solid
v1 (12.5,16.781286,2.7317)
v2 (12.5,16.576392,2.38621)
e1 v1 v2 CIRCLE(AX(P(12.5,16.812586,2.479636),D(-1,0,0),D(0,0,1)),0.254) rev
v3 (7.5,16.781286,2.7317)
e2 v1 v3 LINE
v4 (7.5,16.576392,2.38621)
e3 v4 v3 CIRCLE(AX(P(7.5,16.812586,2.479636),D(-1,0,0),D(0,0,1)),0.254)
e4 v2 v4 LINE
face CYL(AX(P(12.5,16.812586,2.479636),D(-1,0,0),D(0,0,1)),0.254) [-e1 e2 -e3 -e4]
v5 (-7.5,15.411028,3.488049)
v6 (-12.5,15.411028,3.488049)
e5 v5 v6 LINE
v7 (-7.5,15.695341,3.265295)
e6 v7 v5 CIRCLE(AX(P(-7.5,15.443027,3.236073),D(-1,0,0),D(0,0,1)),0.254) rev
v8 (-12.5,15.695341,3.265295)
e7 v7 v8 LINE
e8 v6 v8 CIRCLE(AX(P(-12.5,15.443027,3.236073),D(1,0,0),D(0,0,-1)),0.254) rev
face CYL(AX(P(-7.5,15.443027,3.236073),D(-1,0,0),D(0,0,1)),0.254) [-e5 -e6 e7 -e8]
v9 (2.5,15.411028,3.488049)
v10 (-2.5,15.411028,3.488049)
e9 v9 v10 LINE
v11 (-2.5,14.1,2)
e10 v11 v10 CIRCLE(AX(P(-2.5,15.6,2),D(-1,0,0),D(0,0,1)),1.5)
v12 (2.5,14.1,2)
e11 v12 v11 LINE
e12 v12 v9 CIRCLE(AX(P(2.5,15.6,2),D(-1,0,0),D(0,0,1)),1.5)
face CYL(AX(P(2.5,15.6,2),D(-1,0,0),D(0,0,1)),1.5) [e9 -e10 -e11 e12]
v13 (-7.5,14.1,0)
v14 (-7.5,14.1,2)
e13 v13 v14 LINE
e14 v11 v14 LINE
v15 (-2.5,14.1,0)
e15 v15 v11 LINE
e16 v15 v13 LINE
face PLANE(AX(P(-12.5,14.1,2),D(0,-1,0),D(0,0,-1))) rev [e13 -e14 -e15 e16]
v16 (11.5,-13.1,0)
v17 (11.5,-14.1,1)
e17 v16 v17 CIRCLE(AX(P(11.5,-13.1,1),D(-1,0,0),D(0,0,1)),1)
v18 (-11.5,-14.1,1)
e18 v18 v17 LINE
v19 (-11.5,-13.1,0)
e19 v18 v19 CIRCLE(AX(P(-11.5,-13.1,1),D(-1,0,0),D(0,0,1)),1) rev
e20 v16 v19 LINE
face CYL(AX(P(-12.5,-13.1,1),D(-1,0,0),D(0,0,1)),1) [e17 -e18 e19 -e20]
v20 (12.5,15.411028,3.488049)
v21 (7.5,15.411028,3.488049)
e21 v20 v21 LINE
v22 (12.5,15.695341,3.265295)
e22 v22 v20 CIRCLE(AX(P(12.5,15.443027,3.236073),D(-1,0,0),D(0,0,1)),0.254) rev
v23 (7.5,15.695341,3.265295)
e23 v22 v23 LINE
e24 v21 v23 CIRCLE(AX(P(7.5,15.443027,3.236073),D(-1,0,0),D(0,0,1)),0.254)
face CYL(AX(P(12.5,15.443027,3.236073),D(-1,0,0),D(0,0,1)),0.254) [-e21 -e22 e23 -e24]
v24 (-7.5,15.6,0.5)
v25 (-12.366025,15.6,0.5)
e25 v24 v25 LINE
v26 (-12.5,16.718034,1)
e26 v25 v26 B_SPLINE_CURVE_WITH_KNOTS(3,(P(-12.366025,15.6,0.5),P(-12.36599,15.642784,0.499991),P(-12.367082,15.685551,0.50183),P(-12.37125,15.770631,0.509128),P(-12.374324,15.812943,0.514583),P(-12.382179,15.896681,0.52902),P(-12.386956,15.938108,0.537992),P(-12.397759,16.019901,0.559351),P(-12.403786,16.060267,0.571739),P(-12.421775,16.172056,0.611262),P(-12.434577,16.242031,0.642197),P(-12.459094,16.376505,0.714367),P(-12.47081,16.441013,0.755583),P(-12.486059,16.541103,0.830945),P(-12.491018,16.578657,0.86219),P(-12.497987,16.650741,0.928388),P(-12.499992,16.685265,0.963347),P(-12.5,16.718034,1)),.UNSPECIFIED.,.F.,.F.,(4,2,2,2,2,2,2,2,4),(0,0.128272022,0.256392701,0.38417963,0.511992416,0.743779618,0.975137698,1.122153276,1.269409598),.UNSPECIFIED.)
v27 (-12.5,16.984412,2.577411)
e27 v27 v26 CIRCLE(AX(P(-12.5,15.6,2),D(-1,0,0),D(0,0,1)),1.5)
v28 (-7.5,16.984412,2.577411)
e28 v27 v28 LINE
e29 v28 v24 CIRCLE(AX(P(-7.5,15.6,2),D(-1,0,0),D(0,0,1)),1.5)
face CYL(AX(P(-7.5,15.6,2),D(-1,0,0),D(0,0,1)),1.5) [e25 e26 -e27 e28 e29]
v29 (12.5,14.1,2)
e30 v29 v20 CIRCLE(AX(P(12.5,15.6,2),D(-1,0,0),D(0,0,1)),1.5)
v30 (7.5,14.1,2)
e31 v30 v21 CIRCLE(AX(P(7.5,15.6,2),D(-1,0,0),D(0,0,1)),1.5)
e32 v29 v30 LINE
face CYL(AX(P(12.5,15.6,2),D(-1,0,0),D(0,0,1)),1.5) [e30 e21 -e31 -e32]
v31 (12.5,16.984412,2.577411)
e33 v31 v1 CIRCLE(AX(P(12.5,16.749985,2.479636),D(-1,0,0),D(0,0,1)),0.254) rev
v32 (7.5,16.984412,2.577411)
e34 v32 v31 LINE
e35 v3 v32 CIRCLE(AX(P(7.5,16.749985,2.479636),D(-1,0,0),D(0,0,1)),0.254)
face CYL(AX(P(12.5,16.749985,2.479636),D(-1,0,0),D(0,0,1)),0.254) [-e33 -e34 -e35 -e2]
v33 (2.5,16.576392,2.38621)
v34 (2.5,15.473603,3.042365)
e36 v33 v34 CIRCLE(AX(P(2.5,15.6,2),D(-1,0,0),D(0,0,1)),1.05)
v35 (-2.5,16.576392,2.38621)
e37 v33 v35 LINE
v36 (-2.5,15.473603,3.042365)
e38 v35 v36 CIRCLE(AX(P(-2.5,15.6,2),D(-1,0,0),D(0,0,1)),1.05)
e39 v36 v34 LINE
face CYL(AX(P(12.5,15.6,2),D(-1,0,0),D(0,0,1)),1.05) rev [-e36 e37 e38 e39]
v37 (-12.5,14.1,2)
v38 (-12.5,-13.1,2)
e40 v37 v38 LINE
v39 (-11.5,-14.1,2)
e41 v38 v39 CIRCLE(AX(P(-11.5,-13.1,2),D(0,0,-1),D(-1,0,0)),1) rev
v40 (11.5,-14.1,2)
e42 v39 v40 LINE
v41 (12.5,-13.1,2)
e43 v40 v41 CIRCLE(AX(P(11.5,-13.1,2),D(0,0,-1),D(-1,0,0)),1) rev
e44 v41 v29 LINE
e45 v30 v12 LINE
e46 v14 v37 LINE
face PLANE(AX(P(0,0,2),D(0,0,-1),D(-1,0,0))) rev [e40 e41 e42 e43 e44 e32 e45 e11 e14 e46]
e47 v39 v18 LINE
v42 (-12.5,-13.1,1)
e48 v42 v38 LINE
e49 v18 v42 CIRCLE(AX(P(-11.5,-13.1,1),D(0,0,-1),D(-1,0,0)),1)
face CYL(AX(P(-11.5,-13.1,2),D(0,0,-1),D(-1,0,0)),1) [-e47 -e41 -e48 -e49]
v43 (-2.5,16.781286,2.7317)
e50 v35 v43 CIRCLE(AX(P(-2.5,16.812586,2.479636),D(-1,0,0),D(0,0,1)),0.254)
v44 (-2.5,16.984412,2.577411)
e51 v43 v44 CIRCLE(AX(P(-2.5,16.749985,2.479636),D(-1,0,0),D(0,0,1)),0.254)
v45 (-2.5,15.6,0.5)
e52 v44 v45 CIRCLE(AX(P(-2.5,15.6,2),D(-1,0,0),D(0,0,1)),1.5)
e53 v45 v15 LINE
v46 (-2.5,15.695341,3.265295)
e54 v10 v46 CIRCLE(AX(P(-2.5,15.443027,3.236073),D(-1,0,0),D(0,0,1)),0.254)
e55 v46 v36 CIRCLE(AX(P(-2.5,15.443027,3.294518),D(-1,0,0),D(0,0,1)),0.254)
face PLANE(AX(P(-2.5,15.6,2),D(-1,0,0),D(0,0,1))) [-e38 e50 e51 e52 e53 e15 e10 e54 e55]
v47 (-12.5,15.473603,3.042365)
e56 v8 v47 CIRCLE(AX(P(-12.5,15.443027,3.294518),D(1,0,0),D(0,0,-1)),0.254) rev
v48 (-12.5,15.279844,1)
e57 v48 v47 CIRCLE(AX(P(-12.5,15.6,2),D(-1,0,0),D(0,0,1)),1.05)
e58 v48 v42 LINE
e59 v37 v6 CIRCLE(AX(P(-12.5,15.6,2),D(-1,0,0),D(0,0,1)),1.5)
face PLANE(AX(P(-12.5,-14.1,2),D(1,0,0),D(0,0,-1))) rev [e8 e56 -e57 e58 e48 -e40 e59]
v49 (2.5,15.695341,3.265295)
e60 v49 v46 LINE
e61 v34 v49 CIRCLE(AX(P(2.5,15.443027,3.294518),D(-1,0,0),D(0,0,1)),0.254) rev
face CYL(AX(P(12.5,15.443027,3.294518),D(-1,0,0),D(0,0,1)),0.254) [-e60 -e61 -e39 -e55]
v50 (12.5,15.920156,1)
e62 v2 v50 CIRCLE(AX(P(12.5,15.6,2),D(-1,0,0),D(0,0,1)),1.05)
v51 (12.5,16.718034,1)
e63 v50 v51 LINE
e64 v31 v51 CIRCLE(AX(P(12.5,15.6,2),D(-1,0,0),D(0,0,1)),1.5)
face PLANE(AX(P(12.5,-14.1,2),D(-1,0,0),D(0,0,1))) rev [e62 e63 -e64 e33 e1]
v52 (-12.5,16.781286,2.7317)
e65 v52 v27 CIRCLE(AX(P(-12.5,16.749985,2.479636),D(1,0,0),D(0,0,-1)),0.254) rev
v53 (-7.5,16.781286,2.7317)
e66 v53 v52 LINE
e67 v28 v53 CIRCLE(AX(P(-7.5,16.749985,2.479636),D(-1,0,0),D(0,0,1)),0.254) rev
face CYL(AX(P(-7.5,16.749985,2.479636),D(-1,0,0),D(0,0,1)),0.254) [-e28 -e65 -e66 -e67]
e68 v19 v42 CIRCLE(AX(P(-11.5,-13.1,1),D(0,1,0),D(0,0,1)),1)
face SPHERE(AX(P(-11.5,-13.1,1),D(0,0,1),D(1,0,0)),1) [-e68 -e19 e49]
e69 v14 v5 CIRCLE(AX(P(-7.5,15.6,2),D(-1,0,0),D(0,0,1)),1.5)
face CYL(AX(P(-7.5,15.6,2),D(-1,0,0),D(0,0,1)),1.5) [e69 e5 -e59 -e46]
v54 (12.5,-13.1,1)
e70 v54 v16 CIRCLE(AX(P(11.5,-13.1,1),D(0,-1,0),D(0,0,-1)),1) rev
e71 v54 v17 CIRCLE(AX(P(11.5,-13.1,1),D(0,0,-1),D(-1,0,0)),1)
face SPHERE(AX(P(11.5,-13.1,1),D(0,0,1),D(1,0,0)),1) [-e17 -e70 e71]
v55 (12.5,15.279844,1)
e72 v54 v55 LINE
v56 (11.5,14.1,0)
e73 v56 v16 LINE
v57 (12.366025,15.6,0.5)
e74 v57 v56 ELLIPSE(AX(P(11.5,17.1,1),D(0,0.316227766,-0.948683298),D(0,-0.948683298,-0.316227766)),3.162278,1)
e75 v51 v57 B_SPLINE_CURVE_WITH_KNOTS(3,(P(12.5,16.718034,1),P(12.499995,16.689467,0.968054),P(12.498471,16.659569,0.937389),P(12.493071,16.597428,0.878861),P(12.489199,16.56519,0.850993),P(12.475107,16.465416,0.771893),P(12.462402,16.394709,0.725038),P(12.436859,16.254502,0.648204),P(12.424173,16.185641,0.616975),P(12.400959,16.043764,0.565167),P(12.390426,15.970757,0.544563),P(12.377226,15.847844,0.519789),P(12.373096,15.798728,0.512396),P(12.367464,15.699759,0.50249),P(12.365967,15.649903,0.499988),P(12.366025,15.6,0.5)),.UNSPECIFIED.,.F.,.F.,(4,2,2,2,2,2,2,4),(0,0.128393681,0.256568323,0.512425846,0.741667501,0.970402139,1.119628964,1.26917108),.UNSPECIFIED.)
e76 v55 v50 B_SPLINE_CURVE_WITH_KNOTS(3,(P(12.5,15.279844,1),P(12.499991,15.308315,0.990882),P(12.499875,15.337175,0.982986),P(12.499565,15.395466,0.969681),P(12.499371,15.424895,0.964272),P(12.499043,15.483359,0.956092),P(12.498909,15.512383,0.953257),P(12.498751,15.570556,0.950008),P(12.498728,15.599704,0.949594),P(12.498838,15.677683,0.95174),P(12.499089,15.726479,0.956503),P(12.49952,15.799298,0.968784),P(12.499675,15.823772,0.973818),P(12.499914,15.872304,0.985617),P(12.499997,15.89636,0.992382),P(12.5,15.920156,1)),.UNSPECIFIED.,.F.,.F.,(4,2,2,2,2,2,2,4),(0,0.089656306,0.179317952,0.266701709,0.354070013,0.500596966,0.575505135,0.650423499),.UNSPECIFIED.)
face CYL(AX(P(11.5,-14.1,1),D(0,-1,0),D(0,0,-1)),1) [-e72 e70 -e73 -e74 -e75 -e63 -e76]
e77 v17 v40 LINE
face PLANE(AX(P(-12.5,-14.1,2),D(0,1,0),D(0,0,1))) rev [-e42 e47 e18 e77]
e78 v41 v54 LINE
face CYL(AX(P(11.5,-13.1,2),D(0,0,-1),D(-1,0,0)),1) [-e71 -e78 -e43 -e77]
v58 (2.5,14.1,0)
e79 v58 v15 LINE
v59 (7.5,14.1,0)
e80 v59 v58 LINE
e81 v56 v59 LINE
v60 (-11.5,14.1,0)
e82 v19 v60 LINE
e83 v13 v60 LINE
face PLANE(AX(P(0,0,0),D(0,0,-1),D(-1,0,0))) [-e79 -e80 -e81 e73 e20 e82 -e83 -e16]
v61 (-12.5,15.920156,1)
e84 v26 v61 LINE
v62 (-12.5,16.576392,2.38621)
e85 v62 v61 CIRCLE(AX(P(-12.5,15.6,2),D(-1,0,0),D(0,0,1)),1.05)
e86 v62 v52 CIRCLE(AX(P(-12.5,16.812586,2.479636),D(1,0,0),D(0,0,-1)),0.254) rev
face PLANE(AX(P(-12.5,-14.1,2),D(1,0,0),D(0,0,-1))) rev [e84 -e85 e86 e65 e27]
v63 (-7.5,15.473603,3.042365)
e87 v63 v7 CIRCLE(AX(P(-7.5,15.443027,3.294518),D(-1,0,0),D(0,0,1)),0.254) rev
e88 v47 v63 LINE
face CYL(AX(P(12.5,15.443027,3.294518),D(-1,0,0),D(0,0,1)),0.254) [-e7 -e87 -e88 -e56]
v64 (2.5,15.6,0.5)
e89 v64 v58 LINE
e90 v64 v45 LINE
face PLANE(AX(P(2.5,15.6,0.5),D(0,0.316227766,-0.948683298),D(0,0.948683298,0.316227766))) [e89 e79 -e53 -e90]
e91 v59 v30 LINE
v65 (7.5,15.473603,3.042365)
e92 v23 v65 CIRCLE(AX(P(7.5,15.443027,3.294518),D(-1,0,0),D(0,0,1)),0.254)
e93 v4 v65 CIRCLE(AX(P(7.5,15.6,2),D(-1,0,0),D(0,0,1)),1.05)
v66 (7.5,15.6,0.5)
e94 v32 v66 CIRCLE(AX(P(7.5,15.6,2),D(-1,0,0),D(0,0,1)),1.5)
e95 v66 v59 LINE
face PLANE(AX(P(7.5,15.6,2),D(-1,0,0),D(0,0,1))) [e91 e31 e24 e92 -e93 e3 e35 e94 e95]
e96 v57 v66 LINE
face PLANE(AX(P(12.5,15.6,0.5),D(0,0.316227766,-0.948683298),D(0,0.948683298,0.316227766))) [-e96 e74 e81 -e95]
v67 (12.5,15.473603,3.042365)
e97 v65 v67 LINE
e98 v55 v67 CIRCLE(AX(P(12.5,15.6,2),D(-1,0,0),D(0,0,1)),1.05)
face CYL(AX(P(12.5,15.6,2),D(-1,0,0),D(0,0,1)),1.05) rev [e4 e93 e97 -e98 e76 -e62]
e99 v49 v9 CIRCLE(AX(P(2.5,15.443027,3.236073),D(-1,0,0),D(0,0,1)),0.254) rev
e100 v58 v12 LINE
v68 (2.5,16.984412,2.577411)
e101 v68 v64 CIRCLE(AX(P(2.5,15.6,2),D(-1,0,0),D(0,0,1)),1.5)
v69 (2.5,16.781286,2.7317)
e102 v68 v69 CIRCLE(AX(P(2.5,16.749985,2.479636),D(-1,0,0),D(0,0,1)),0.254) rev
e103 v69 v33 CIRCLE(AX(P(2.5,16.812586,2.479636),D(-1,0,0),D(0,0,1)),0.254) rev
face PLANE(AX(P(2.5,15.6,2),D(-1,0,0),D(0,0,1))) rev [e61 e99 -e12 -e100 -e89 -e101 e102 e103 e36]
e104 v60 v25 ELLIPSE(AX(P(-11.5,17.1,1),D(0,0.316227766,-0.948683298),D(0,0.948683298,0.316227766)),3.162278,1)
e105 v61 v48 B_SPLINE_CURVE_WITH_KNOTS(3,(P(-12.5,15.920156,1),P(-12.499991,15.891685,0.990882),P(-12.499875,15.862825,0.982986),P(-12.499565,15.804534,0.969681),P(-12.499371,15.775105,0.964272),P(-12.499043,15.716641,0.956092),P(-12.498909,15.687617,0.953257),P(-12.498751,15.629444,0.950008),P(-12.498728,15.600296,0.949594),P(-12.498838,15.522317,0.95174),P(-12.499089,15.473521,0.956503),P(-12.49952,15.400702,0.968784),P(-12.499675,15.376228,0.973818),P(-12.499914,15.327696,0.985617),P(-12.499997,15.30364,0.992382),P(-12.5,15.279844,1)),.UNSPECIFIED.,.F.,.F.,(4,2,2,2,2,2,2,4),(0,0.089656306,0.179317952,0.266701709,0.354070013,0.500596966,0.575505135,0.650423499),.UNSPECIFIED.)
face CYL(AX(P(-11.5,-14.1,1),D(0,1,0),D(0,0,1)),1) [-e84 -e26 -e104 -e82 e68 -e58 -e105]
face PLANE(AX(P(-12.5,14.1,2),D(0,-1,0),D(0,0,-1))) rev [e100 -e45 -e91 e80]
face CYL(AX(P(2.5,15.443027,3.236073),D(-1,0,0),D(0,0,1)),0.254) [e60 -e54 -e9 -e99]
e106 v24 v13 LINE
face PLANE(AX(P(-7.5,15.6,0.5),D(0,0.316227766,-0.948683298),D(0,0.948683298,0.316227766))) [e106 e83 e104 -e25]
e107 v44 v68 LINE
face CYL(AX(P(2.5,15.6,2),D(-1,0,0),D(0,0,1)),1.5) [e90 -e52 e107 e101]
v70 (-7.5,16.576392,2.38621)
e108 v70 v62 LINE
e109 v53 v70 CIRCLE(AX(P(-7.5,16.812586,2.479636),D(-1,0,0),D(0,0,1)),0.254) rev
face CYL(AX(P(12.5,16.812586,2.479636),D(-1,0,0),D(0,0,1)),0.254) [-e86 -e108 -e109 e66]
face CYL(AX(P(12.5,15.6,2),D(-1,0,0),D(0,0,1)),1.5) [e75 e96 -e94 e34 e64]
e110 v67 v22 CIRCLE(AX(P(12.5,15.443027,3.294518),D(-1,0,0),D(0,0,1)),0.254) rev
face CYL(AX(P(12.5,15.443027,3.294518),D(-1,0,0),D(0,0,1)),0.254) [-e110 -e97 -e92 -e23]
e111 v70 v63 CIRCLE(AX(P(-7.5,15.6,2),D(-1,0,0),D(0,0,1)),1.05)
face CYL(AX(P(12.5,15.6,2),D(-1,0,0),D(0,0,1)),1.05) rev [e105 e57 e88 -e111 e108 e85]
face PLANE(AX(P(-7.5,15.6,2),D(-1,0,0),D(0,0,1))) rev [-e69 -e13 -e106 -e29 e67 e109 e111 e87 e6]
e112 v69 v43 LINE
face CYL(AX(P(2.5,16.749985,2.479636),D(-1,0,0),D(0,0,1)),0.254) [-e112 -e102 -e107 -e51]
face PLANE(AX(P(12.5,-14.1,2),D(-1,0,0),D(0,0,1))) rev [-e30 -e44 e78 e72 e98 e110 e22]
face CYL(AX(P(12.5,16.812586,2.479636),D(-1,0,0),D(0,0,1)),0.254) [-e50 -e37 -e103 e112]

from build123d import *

# Parameters (mm, degrees)
SKETCH1_W           = 25
SKETCH1_H           = 28.2
BOSS_EXTRUDE1_DEPTH = 2
BOSS_EXTRUDE2_DEPTH = 5
LPATTERN1_COUNT     = 3
LPATTERN1_PITCH     = 10
SKETCH6_R           = 1.050000034
CUT_EXTRUDE1_DEPTH  = 31.490326335
FILLET1_R           = 1
FILLET2_R           = 1
SKETCH7_W           = 1.937328833
SKETCH7_H           = 1.211322367
CUT_EXTRUDE2_DEPTH  = 31.490326484
FILLET7_R           = 0.254


with BuildPart() as part:
    # Sketch1 → Boss-Extrude1 (new body)
    with BuildSketch(Plane.XY):
        Rectangle(SKETCH1_W, SKETCH1_H)
    extrude(amount=BOSS_EXTRUDE1_DEPTH)

    # Sketch5 → Boss-Extrude2 (add)
    with BuildSketch(Plane.ZY.offset(12.5)):
        with BuildLine():
            Line((0.5, 15.6), (0, 14.1))
            Line((0, 14.1), (2, 14.1))
            ThreePointArc((2, 14.1), (3.060660172, 16.660660172), (0.5, 15.6))
        make_face()
    boss_extrude2 = extrude(amount=-BOSS_EXTRUDE2_DEPTH)

    # LPattern1: Boss-Extrude2 ×3
    with Locations(*[(i * LPATTERN1_PITCH, 0, 0) for i in range(1, LPATTERN1_COUNT)]):
        add(boss_extrude2)

    # Sketch6 → Cut-Extrude1 (cut, through all)
    with BuildSketch(Plane.ZY.offset(12.5)):
        with Locations((2, 15.6)):
            Circle(SKETCH6_R)
    extrude(amount=-CUT_EXTRUDE1_DEPTH, mode=Mode.SUBTRACT)

    # Fillet1
    # the kernel refuses this fillet: 1 mm, written as the material it takes off along each edge
    with BuildSketch(Plane(origin=(12.5, -20.1, 0), x_dir=(0, 0, 1), z_dir=(0, 1, 0)), Plane(origin=(-12.5, 20.1, 0), x_dir=(0, 0, 1), z_dir=(0, -1, 0))) as fillet1_piece_1:
        with BuildLine():
            CenterArc((FILLET1_R, -FILLET1_R), FILLET1_R, 90, 90)
            Line((0, -FILLET1_R), (-FILLET1_R * 0.02, -FILLET1_R))
            Line((-FILLET1_R * 0.02, -FILLET1_R), (-FILLET1_R * 0.02, FILLET1_R * 0.02))
            Line((-FILLET1_R * 0.02, FILLET1_R * 0.02), (FILLET1_R, FILLET1_R * 0.02))
            Line((FILLET1_R, FILLET1_R * 0.02), (FILLET1_R, 0))
        make_face()
    extrude(amount=40.2, mode=Mode.SUBTRACT)
    with BuildSketch(Plane(origin=(-18.5, -14.1, 0), x_dir=(0, 0, 1), z_dir=(1, 0, 0))) as fillet1_piece_2:
        with BuildLine():
            CenterArc((FILLET1_R, -FILLET1_R), FILLET1_R, 90, 90)
            Line((0, -FILLET1_R), (-FILLET1_R * 0.02, -FILLET1_R))
            Line((-FILLET1_R * 0.02, -FILLET1_R), (-FILLET1_R * 0.02, FILLET1_R * 0.02))
            Line((-FILLET1_R * 0.02, FILLET1_R * 0.02), (FILLET1_R, FILLET1_R * 0.02))
            Line((FILLET1_R, FILLET1_R * 0.02), (FILLET1_R, 0))
        make_face()
    extrude(amount=37, mode=Mode.SUBTRACT)

    # Fillet2
    # the kernel refuses this fillet: 1 mm, written as the material it takes off along each edge
    with BuildSketch(Plane(origin=(-11.5, -13.1, 1), x_dir=(-1, 0, 0), z_dir=(0, -1, 0))) as fillet2_piece_1_section:
        Polygon((0, 0), (FILLET2_R, 0), (FILLET2_R, FILLET2_R), (0, FILLET2_R), align=None)
    fillet2_piece_1 = extrude(amount=FILLET2_R, mode=Mode.PRIVATE)
    fillet2_piece_1 = fillet2_piece_1 - Plane(origin=(-11.5, -13.1, 1), x_dir=(0.7071067811865475, 0, 0.7071067811865475), z_dir=(0, -1, 0)) * Sphere(FILLET2_R, mode=Mode.PRIVATE)
    add(fillet2_piece_1, mode=Mode.SUBTRACT)
    with BuildSketch(Plane(origin=(11.5, -13.1, 1), x_dir=(1, 0, 0), z_dir=(0, -1, 0))) as fillet2_piece_2_section:
        Polygon((0, 0), (FILLET2_R, 0), (FILLET2_R, -FILLET2_R), (0, -FILLET2_R), align=None)
    fillet2_piece_2 = extrude(amount=FILLET2_R, mode=Mode.PRIVATE)
    fillet2_piece_2 = fillet2_piece_2 - Plane(origin=(11.5, -13.1, 1), x_dir=(-0.7071067811865475, 0, 0.7071067811865475), z_dir=(0, -1, 0)) * Sphere(FILLET2_R, mode=Mode.PRIVATE)
    add(fillet2_piece_2, mode=Mode.SUBTRACT)
    with BuildSketch(Plane(origin=(12.5, -14.1, 1), x_dir=(-1, 0, 0), z_dir=(0, 0, 1))) as fillet2_piece_3:
        with BuildLine():
            CenterArc((FILLET2_R, -FILLET2_R), FILLET2_R, 90, 90)
            Line((0, -FILLET2_R), (0, 0))
            Line((0, 0), (FILLET2_R, 0))
        make_face()
    extrude(amount=3.5, mode=Mode.SUBTRACT)
    with BuildSketch(Plane(origin=(-12.5, -14.1, 1), x_dir=(1, 0, 0), z_dir=(0, 0, 1))) as fillet2_piece_4:
        with BuildLine():
            CenterArc((FILLET2_R, FILLET2_R), FILLET2_R, 180, 90)
            Line((0, FILLET2_R), (0, 0))
            Line((0, 0), (FILLET2_R, 0))
        make_face()
    extrude(amount=3.5, mode=Mode.SUBTRACT)

    # Sketch7 → Cut-Extrude2 (cut, through all)
    with BuildSketch(Plane.ZY.offset(12.5)):
        with Locations((3.702300239, 16.302688342)):
            Rectangle(SKETCH7_W, SKETCH7_H)
    extrude(amount=-CUT_EXTRUDE2_DEPTH, mode=Mode.SUBTRACT)

    # Fillet7
    # the kernel refuses this fillet: 0.254 mm, written as the material it takes off along each edge
    with BuildSketch(Plane(origin=(-6.784662672, 15.697027158, 3.496858621), x_dir=(0, -0.999525916105083, -0.03078868354273752), z_dir=(-1, 0, 0))) as fillet7_piece_1:
        with BuildLine():
            CenterArc((0.26190884, -0.252842039), FILLET7_R, 84.526905726, 97.237434721)
            Line((0.008029258, -0.260662364), (0, 0))
            ThreePointArc((0, 0), (0.143067466, 0.006838354), (0.286134931, 0))
        make_face()
    extrude(amount=6.430674656, mode=Mode.SUBTRACT)
    with BuildSketch(Plane(origin=(-6.877474788, 15.697027158, 3.045507437), x_dir=(0, 0, 1), z_dir=(-1, 0, 0))) as fillet7_piece_2:
        with BuildLine():
            CenterArc((0.249010085, -0.254), FILLET7_R, 90, 83.086084758)
            ThreePointArc((-0.003142862, -0.223424002), (0.004388728, -0.111795842), (0, 0))
            Line((0, 0), (0.249010085, 0))
        make_face()
    extrude(amount=6.245050424, mode=Mode.SUBTRACT)
    with BuildSketch(Plane(origin=(-6.34649613, 16.351184765, 2.733635822), x_dir=(0, 1, 0), z_dir=(-1, 0, 0)), Plane(origin=(13.65350387, 16.351184765, 2.733635822), x_dir=(0, 1, 0), z_dir=(-1, 0, 0)), Plane(origin=(3.65350387, 16.351184765, 2.733635822), x_dir=(0, 1, 0), z_dir=(-1, 0, 0))) as fillet7_piece_3:
        with BuildLine():
            CenterArc((0.461401548, 0.254), FILLET7_R, 158.418835743, 111.581164257)
            ThreePointArc((0.225207594, 0.347425994), (0.129898026, 0.162502575), (0, 0))
            Line((0, 0), (0.461401548, 0))
        make_face()
    extrude(amount=7.30700774, mode=Mode.SUBTRACT)
    with BuildSketch(Plane(origin=(-12.934394729, 16.908349525, 2.733635822), x_dir=(0, -1, 0), z_dir=(1, 0, 0)), Plane(origin=(7.065605271, 16.908349525, 2.733635822), x_dir=(0, -1, 0), z_dir=(1, 0, 0)), Plane(origin=(-2.934394729, 16.908349525, 2.733635822), x_dir=(0, -1, 0), z_dir=(1, 0, 0))) as fillet7_piece_4:
        with BuildLine():
            CenterArc((0.158364535, 0.254), FILLET7_R, 202.640044459, 67.359955541)
            ThreePointArc((-0.076062582, 0.156225121), (-0.040295304, 0.077010263), (0, 0))
            Line((0, 0), (0.158364535, 0))
        make_face()
    extrude(amount=5.868789458, mode=Mode.SUBTRACT)
    with BuildSketch(Plane(origin=(13.215337328, 15.697027158, 3.496858621), x_dir=(0, 0, -1), z_dir=(-1, 0, 0)), Plane(origin=(3.215337328, 15.697027158, 3.496858621), x_dir=(0, 0, -1), z_dir=(-1, 0, 0))) as fillet7_piece_5:
        with BuildLine():
            CenterArc((0.260785999, 0.254), FILLET7_R, 172.762565279, 97.237434721)
            ThreePointArc((0.008809718, 0.285999279), (-0.002430253, 0.143210184), (0, 0))
            Line((0, 0), (0.260785999, 0))
        make_face()
    extrude(amount=6.430674656, mode=Mode.SUBTRACT)
    with BuildSketch(Plane(origin=(13.122525212, 15.697027158, 3.045507437), x_dir=(0, -0.999901077195103, -0.014065412332113414), z_dir=(-1, 0, 0)), Plane(origin=(3.122525212, 15.697027158, 3.045507437), x_dir=(0, -0.999901077195103, -0.014065412332113414), z_dir=(-1, 0, 0))) as fillet7_piece_6:
        with BuildLine():
            CenterArc((0.250472444, 0.252558067), FILLET7_R, 180.805915338, 83.086084758)
            Line((-0.00350243, 0.248985452), (0, 0))
            ThreePointArc((0, 0), (0.111723053, 0.005960748), (0.223446106, 0))
        make_face()
    extrude(amount=6.245050424, mode=Mode.SUBTRACT)


solid = part.part
